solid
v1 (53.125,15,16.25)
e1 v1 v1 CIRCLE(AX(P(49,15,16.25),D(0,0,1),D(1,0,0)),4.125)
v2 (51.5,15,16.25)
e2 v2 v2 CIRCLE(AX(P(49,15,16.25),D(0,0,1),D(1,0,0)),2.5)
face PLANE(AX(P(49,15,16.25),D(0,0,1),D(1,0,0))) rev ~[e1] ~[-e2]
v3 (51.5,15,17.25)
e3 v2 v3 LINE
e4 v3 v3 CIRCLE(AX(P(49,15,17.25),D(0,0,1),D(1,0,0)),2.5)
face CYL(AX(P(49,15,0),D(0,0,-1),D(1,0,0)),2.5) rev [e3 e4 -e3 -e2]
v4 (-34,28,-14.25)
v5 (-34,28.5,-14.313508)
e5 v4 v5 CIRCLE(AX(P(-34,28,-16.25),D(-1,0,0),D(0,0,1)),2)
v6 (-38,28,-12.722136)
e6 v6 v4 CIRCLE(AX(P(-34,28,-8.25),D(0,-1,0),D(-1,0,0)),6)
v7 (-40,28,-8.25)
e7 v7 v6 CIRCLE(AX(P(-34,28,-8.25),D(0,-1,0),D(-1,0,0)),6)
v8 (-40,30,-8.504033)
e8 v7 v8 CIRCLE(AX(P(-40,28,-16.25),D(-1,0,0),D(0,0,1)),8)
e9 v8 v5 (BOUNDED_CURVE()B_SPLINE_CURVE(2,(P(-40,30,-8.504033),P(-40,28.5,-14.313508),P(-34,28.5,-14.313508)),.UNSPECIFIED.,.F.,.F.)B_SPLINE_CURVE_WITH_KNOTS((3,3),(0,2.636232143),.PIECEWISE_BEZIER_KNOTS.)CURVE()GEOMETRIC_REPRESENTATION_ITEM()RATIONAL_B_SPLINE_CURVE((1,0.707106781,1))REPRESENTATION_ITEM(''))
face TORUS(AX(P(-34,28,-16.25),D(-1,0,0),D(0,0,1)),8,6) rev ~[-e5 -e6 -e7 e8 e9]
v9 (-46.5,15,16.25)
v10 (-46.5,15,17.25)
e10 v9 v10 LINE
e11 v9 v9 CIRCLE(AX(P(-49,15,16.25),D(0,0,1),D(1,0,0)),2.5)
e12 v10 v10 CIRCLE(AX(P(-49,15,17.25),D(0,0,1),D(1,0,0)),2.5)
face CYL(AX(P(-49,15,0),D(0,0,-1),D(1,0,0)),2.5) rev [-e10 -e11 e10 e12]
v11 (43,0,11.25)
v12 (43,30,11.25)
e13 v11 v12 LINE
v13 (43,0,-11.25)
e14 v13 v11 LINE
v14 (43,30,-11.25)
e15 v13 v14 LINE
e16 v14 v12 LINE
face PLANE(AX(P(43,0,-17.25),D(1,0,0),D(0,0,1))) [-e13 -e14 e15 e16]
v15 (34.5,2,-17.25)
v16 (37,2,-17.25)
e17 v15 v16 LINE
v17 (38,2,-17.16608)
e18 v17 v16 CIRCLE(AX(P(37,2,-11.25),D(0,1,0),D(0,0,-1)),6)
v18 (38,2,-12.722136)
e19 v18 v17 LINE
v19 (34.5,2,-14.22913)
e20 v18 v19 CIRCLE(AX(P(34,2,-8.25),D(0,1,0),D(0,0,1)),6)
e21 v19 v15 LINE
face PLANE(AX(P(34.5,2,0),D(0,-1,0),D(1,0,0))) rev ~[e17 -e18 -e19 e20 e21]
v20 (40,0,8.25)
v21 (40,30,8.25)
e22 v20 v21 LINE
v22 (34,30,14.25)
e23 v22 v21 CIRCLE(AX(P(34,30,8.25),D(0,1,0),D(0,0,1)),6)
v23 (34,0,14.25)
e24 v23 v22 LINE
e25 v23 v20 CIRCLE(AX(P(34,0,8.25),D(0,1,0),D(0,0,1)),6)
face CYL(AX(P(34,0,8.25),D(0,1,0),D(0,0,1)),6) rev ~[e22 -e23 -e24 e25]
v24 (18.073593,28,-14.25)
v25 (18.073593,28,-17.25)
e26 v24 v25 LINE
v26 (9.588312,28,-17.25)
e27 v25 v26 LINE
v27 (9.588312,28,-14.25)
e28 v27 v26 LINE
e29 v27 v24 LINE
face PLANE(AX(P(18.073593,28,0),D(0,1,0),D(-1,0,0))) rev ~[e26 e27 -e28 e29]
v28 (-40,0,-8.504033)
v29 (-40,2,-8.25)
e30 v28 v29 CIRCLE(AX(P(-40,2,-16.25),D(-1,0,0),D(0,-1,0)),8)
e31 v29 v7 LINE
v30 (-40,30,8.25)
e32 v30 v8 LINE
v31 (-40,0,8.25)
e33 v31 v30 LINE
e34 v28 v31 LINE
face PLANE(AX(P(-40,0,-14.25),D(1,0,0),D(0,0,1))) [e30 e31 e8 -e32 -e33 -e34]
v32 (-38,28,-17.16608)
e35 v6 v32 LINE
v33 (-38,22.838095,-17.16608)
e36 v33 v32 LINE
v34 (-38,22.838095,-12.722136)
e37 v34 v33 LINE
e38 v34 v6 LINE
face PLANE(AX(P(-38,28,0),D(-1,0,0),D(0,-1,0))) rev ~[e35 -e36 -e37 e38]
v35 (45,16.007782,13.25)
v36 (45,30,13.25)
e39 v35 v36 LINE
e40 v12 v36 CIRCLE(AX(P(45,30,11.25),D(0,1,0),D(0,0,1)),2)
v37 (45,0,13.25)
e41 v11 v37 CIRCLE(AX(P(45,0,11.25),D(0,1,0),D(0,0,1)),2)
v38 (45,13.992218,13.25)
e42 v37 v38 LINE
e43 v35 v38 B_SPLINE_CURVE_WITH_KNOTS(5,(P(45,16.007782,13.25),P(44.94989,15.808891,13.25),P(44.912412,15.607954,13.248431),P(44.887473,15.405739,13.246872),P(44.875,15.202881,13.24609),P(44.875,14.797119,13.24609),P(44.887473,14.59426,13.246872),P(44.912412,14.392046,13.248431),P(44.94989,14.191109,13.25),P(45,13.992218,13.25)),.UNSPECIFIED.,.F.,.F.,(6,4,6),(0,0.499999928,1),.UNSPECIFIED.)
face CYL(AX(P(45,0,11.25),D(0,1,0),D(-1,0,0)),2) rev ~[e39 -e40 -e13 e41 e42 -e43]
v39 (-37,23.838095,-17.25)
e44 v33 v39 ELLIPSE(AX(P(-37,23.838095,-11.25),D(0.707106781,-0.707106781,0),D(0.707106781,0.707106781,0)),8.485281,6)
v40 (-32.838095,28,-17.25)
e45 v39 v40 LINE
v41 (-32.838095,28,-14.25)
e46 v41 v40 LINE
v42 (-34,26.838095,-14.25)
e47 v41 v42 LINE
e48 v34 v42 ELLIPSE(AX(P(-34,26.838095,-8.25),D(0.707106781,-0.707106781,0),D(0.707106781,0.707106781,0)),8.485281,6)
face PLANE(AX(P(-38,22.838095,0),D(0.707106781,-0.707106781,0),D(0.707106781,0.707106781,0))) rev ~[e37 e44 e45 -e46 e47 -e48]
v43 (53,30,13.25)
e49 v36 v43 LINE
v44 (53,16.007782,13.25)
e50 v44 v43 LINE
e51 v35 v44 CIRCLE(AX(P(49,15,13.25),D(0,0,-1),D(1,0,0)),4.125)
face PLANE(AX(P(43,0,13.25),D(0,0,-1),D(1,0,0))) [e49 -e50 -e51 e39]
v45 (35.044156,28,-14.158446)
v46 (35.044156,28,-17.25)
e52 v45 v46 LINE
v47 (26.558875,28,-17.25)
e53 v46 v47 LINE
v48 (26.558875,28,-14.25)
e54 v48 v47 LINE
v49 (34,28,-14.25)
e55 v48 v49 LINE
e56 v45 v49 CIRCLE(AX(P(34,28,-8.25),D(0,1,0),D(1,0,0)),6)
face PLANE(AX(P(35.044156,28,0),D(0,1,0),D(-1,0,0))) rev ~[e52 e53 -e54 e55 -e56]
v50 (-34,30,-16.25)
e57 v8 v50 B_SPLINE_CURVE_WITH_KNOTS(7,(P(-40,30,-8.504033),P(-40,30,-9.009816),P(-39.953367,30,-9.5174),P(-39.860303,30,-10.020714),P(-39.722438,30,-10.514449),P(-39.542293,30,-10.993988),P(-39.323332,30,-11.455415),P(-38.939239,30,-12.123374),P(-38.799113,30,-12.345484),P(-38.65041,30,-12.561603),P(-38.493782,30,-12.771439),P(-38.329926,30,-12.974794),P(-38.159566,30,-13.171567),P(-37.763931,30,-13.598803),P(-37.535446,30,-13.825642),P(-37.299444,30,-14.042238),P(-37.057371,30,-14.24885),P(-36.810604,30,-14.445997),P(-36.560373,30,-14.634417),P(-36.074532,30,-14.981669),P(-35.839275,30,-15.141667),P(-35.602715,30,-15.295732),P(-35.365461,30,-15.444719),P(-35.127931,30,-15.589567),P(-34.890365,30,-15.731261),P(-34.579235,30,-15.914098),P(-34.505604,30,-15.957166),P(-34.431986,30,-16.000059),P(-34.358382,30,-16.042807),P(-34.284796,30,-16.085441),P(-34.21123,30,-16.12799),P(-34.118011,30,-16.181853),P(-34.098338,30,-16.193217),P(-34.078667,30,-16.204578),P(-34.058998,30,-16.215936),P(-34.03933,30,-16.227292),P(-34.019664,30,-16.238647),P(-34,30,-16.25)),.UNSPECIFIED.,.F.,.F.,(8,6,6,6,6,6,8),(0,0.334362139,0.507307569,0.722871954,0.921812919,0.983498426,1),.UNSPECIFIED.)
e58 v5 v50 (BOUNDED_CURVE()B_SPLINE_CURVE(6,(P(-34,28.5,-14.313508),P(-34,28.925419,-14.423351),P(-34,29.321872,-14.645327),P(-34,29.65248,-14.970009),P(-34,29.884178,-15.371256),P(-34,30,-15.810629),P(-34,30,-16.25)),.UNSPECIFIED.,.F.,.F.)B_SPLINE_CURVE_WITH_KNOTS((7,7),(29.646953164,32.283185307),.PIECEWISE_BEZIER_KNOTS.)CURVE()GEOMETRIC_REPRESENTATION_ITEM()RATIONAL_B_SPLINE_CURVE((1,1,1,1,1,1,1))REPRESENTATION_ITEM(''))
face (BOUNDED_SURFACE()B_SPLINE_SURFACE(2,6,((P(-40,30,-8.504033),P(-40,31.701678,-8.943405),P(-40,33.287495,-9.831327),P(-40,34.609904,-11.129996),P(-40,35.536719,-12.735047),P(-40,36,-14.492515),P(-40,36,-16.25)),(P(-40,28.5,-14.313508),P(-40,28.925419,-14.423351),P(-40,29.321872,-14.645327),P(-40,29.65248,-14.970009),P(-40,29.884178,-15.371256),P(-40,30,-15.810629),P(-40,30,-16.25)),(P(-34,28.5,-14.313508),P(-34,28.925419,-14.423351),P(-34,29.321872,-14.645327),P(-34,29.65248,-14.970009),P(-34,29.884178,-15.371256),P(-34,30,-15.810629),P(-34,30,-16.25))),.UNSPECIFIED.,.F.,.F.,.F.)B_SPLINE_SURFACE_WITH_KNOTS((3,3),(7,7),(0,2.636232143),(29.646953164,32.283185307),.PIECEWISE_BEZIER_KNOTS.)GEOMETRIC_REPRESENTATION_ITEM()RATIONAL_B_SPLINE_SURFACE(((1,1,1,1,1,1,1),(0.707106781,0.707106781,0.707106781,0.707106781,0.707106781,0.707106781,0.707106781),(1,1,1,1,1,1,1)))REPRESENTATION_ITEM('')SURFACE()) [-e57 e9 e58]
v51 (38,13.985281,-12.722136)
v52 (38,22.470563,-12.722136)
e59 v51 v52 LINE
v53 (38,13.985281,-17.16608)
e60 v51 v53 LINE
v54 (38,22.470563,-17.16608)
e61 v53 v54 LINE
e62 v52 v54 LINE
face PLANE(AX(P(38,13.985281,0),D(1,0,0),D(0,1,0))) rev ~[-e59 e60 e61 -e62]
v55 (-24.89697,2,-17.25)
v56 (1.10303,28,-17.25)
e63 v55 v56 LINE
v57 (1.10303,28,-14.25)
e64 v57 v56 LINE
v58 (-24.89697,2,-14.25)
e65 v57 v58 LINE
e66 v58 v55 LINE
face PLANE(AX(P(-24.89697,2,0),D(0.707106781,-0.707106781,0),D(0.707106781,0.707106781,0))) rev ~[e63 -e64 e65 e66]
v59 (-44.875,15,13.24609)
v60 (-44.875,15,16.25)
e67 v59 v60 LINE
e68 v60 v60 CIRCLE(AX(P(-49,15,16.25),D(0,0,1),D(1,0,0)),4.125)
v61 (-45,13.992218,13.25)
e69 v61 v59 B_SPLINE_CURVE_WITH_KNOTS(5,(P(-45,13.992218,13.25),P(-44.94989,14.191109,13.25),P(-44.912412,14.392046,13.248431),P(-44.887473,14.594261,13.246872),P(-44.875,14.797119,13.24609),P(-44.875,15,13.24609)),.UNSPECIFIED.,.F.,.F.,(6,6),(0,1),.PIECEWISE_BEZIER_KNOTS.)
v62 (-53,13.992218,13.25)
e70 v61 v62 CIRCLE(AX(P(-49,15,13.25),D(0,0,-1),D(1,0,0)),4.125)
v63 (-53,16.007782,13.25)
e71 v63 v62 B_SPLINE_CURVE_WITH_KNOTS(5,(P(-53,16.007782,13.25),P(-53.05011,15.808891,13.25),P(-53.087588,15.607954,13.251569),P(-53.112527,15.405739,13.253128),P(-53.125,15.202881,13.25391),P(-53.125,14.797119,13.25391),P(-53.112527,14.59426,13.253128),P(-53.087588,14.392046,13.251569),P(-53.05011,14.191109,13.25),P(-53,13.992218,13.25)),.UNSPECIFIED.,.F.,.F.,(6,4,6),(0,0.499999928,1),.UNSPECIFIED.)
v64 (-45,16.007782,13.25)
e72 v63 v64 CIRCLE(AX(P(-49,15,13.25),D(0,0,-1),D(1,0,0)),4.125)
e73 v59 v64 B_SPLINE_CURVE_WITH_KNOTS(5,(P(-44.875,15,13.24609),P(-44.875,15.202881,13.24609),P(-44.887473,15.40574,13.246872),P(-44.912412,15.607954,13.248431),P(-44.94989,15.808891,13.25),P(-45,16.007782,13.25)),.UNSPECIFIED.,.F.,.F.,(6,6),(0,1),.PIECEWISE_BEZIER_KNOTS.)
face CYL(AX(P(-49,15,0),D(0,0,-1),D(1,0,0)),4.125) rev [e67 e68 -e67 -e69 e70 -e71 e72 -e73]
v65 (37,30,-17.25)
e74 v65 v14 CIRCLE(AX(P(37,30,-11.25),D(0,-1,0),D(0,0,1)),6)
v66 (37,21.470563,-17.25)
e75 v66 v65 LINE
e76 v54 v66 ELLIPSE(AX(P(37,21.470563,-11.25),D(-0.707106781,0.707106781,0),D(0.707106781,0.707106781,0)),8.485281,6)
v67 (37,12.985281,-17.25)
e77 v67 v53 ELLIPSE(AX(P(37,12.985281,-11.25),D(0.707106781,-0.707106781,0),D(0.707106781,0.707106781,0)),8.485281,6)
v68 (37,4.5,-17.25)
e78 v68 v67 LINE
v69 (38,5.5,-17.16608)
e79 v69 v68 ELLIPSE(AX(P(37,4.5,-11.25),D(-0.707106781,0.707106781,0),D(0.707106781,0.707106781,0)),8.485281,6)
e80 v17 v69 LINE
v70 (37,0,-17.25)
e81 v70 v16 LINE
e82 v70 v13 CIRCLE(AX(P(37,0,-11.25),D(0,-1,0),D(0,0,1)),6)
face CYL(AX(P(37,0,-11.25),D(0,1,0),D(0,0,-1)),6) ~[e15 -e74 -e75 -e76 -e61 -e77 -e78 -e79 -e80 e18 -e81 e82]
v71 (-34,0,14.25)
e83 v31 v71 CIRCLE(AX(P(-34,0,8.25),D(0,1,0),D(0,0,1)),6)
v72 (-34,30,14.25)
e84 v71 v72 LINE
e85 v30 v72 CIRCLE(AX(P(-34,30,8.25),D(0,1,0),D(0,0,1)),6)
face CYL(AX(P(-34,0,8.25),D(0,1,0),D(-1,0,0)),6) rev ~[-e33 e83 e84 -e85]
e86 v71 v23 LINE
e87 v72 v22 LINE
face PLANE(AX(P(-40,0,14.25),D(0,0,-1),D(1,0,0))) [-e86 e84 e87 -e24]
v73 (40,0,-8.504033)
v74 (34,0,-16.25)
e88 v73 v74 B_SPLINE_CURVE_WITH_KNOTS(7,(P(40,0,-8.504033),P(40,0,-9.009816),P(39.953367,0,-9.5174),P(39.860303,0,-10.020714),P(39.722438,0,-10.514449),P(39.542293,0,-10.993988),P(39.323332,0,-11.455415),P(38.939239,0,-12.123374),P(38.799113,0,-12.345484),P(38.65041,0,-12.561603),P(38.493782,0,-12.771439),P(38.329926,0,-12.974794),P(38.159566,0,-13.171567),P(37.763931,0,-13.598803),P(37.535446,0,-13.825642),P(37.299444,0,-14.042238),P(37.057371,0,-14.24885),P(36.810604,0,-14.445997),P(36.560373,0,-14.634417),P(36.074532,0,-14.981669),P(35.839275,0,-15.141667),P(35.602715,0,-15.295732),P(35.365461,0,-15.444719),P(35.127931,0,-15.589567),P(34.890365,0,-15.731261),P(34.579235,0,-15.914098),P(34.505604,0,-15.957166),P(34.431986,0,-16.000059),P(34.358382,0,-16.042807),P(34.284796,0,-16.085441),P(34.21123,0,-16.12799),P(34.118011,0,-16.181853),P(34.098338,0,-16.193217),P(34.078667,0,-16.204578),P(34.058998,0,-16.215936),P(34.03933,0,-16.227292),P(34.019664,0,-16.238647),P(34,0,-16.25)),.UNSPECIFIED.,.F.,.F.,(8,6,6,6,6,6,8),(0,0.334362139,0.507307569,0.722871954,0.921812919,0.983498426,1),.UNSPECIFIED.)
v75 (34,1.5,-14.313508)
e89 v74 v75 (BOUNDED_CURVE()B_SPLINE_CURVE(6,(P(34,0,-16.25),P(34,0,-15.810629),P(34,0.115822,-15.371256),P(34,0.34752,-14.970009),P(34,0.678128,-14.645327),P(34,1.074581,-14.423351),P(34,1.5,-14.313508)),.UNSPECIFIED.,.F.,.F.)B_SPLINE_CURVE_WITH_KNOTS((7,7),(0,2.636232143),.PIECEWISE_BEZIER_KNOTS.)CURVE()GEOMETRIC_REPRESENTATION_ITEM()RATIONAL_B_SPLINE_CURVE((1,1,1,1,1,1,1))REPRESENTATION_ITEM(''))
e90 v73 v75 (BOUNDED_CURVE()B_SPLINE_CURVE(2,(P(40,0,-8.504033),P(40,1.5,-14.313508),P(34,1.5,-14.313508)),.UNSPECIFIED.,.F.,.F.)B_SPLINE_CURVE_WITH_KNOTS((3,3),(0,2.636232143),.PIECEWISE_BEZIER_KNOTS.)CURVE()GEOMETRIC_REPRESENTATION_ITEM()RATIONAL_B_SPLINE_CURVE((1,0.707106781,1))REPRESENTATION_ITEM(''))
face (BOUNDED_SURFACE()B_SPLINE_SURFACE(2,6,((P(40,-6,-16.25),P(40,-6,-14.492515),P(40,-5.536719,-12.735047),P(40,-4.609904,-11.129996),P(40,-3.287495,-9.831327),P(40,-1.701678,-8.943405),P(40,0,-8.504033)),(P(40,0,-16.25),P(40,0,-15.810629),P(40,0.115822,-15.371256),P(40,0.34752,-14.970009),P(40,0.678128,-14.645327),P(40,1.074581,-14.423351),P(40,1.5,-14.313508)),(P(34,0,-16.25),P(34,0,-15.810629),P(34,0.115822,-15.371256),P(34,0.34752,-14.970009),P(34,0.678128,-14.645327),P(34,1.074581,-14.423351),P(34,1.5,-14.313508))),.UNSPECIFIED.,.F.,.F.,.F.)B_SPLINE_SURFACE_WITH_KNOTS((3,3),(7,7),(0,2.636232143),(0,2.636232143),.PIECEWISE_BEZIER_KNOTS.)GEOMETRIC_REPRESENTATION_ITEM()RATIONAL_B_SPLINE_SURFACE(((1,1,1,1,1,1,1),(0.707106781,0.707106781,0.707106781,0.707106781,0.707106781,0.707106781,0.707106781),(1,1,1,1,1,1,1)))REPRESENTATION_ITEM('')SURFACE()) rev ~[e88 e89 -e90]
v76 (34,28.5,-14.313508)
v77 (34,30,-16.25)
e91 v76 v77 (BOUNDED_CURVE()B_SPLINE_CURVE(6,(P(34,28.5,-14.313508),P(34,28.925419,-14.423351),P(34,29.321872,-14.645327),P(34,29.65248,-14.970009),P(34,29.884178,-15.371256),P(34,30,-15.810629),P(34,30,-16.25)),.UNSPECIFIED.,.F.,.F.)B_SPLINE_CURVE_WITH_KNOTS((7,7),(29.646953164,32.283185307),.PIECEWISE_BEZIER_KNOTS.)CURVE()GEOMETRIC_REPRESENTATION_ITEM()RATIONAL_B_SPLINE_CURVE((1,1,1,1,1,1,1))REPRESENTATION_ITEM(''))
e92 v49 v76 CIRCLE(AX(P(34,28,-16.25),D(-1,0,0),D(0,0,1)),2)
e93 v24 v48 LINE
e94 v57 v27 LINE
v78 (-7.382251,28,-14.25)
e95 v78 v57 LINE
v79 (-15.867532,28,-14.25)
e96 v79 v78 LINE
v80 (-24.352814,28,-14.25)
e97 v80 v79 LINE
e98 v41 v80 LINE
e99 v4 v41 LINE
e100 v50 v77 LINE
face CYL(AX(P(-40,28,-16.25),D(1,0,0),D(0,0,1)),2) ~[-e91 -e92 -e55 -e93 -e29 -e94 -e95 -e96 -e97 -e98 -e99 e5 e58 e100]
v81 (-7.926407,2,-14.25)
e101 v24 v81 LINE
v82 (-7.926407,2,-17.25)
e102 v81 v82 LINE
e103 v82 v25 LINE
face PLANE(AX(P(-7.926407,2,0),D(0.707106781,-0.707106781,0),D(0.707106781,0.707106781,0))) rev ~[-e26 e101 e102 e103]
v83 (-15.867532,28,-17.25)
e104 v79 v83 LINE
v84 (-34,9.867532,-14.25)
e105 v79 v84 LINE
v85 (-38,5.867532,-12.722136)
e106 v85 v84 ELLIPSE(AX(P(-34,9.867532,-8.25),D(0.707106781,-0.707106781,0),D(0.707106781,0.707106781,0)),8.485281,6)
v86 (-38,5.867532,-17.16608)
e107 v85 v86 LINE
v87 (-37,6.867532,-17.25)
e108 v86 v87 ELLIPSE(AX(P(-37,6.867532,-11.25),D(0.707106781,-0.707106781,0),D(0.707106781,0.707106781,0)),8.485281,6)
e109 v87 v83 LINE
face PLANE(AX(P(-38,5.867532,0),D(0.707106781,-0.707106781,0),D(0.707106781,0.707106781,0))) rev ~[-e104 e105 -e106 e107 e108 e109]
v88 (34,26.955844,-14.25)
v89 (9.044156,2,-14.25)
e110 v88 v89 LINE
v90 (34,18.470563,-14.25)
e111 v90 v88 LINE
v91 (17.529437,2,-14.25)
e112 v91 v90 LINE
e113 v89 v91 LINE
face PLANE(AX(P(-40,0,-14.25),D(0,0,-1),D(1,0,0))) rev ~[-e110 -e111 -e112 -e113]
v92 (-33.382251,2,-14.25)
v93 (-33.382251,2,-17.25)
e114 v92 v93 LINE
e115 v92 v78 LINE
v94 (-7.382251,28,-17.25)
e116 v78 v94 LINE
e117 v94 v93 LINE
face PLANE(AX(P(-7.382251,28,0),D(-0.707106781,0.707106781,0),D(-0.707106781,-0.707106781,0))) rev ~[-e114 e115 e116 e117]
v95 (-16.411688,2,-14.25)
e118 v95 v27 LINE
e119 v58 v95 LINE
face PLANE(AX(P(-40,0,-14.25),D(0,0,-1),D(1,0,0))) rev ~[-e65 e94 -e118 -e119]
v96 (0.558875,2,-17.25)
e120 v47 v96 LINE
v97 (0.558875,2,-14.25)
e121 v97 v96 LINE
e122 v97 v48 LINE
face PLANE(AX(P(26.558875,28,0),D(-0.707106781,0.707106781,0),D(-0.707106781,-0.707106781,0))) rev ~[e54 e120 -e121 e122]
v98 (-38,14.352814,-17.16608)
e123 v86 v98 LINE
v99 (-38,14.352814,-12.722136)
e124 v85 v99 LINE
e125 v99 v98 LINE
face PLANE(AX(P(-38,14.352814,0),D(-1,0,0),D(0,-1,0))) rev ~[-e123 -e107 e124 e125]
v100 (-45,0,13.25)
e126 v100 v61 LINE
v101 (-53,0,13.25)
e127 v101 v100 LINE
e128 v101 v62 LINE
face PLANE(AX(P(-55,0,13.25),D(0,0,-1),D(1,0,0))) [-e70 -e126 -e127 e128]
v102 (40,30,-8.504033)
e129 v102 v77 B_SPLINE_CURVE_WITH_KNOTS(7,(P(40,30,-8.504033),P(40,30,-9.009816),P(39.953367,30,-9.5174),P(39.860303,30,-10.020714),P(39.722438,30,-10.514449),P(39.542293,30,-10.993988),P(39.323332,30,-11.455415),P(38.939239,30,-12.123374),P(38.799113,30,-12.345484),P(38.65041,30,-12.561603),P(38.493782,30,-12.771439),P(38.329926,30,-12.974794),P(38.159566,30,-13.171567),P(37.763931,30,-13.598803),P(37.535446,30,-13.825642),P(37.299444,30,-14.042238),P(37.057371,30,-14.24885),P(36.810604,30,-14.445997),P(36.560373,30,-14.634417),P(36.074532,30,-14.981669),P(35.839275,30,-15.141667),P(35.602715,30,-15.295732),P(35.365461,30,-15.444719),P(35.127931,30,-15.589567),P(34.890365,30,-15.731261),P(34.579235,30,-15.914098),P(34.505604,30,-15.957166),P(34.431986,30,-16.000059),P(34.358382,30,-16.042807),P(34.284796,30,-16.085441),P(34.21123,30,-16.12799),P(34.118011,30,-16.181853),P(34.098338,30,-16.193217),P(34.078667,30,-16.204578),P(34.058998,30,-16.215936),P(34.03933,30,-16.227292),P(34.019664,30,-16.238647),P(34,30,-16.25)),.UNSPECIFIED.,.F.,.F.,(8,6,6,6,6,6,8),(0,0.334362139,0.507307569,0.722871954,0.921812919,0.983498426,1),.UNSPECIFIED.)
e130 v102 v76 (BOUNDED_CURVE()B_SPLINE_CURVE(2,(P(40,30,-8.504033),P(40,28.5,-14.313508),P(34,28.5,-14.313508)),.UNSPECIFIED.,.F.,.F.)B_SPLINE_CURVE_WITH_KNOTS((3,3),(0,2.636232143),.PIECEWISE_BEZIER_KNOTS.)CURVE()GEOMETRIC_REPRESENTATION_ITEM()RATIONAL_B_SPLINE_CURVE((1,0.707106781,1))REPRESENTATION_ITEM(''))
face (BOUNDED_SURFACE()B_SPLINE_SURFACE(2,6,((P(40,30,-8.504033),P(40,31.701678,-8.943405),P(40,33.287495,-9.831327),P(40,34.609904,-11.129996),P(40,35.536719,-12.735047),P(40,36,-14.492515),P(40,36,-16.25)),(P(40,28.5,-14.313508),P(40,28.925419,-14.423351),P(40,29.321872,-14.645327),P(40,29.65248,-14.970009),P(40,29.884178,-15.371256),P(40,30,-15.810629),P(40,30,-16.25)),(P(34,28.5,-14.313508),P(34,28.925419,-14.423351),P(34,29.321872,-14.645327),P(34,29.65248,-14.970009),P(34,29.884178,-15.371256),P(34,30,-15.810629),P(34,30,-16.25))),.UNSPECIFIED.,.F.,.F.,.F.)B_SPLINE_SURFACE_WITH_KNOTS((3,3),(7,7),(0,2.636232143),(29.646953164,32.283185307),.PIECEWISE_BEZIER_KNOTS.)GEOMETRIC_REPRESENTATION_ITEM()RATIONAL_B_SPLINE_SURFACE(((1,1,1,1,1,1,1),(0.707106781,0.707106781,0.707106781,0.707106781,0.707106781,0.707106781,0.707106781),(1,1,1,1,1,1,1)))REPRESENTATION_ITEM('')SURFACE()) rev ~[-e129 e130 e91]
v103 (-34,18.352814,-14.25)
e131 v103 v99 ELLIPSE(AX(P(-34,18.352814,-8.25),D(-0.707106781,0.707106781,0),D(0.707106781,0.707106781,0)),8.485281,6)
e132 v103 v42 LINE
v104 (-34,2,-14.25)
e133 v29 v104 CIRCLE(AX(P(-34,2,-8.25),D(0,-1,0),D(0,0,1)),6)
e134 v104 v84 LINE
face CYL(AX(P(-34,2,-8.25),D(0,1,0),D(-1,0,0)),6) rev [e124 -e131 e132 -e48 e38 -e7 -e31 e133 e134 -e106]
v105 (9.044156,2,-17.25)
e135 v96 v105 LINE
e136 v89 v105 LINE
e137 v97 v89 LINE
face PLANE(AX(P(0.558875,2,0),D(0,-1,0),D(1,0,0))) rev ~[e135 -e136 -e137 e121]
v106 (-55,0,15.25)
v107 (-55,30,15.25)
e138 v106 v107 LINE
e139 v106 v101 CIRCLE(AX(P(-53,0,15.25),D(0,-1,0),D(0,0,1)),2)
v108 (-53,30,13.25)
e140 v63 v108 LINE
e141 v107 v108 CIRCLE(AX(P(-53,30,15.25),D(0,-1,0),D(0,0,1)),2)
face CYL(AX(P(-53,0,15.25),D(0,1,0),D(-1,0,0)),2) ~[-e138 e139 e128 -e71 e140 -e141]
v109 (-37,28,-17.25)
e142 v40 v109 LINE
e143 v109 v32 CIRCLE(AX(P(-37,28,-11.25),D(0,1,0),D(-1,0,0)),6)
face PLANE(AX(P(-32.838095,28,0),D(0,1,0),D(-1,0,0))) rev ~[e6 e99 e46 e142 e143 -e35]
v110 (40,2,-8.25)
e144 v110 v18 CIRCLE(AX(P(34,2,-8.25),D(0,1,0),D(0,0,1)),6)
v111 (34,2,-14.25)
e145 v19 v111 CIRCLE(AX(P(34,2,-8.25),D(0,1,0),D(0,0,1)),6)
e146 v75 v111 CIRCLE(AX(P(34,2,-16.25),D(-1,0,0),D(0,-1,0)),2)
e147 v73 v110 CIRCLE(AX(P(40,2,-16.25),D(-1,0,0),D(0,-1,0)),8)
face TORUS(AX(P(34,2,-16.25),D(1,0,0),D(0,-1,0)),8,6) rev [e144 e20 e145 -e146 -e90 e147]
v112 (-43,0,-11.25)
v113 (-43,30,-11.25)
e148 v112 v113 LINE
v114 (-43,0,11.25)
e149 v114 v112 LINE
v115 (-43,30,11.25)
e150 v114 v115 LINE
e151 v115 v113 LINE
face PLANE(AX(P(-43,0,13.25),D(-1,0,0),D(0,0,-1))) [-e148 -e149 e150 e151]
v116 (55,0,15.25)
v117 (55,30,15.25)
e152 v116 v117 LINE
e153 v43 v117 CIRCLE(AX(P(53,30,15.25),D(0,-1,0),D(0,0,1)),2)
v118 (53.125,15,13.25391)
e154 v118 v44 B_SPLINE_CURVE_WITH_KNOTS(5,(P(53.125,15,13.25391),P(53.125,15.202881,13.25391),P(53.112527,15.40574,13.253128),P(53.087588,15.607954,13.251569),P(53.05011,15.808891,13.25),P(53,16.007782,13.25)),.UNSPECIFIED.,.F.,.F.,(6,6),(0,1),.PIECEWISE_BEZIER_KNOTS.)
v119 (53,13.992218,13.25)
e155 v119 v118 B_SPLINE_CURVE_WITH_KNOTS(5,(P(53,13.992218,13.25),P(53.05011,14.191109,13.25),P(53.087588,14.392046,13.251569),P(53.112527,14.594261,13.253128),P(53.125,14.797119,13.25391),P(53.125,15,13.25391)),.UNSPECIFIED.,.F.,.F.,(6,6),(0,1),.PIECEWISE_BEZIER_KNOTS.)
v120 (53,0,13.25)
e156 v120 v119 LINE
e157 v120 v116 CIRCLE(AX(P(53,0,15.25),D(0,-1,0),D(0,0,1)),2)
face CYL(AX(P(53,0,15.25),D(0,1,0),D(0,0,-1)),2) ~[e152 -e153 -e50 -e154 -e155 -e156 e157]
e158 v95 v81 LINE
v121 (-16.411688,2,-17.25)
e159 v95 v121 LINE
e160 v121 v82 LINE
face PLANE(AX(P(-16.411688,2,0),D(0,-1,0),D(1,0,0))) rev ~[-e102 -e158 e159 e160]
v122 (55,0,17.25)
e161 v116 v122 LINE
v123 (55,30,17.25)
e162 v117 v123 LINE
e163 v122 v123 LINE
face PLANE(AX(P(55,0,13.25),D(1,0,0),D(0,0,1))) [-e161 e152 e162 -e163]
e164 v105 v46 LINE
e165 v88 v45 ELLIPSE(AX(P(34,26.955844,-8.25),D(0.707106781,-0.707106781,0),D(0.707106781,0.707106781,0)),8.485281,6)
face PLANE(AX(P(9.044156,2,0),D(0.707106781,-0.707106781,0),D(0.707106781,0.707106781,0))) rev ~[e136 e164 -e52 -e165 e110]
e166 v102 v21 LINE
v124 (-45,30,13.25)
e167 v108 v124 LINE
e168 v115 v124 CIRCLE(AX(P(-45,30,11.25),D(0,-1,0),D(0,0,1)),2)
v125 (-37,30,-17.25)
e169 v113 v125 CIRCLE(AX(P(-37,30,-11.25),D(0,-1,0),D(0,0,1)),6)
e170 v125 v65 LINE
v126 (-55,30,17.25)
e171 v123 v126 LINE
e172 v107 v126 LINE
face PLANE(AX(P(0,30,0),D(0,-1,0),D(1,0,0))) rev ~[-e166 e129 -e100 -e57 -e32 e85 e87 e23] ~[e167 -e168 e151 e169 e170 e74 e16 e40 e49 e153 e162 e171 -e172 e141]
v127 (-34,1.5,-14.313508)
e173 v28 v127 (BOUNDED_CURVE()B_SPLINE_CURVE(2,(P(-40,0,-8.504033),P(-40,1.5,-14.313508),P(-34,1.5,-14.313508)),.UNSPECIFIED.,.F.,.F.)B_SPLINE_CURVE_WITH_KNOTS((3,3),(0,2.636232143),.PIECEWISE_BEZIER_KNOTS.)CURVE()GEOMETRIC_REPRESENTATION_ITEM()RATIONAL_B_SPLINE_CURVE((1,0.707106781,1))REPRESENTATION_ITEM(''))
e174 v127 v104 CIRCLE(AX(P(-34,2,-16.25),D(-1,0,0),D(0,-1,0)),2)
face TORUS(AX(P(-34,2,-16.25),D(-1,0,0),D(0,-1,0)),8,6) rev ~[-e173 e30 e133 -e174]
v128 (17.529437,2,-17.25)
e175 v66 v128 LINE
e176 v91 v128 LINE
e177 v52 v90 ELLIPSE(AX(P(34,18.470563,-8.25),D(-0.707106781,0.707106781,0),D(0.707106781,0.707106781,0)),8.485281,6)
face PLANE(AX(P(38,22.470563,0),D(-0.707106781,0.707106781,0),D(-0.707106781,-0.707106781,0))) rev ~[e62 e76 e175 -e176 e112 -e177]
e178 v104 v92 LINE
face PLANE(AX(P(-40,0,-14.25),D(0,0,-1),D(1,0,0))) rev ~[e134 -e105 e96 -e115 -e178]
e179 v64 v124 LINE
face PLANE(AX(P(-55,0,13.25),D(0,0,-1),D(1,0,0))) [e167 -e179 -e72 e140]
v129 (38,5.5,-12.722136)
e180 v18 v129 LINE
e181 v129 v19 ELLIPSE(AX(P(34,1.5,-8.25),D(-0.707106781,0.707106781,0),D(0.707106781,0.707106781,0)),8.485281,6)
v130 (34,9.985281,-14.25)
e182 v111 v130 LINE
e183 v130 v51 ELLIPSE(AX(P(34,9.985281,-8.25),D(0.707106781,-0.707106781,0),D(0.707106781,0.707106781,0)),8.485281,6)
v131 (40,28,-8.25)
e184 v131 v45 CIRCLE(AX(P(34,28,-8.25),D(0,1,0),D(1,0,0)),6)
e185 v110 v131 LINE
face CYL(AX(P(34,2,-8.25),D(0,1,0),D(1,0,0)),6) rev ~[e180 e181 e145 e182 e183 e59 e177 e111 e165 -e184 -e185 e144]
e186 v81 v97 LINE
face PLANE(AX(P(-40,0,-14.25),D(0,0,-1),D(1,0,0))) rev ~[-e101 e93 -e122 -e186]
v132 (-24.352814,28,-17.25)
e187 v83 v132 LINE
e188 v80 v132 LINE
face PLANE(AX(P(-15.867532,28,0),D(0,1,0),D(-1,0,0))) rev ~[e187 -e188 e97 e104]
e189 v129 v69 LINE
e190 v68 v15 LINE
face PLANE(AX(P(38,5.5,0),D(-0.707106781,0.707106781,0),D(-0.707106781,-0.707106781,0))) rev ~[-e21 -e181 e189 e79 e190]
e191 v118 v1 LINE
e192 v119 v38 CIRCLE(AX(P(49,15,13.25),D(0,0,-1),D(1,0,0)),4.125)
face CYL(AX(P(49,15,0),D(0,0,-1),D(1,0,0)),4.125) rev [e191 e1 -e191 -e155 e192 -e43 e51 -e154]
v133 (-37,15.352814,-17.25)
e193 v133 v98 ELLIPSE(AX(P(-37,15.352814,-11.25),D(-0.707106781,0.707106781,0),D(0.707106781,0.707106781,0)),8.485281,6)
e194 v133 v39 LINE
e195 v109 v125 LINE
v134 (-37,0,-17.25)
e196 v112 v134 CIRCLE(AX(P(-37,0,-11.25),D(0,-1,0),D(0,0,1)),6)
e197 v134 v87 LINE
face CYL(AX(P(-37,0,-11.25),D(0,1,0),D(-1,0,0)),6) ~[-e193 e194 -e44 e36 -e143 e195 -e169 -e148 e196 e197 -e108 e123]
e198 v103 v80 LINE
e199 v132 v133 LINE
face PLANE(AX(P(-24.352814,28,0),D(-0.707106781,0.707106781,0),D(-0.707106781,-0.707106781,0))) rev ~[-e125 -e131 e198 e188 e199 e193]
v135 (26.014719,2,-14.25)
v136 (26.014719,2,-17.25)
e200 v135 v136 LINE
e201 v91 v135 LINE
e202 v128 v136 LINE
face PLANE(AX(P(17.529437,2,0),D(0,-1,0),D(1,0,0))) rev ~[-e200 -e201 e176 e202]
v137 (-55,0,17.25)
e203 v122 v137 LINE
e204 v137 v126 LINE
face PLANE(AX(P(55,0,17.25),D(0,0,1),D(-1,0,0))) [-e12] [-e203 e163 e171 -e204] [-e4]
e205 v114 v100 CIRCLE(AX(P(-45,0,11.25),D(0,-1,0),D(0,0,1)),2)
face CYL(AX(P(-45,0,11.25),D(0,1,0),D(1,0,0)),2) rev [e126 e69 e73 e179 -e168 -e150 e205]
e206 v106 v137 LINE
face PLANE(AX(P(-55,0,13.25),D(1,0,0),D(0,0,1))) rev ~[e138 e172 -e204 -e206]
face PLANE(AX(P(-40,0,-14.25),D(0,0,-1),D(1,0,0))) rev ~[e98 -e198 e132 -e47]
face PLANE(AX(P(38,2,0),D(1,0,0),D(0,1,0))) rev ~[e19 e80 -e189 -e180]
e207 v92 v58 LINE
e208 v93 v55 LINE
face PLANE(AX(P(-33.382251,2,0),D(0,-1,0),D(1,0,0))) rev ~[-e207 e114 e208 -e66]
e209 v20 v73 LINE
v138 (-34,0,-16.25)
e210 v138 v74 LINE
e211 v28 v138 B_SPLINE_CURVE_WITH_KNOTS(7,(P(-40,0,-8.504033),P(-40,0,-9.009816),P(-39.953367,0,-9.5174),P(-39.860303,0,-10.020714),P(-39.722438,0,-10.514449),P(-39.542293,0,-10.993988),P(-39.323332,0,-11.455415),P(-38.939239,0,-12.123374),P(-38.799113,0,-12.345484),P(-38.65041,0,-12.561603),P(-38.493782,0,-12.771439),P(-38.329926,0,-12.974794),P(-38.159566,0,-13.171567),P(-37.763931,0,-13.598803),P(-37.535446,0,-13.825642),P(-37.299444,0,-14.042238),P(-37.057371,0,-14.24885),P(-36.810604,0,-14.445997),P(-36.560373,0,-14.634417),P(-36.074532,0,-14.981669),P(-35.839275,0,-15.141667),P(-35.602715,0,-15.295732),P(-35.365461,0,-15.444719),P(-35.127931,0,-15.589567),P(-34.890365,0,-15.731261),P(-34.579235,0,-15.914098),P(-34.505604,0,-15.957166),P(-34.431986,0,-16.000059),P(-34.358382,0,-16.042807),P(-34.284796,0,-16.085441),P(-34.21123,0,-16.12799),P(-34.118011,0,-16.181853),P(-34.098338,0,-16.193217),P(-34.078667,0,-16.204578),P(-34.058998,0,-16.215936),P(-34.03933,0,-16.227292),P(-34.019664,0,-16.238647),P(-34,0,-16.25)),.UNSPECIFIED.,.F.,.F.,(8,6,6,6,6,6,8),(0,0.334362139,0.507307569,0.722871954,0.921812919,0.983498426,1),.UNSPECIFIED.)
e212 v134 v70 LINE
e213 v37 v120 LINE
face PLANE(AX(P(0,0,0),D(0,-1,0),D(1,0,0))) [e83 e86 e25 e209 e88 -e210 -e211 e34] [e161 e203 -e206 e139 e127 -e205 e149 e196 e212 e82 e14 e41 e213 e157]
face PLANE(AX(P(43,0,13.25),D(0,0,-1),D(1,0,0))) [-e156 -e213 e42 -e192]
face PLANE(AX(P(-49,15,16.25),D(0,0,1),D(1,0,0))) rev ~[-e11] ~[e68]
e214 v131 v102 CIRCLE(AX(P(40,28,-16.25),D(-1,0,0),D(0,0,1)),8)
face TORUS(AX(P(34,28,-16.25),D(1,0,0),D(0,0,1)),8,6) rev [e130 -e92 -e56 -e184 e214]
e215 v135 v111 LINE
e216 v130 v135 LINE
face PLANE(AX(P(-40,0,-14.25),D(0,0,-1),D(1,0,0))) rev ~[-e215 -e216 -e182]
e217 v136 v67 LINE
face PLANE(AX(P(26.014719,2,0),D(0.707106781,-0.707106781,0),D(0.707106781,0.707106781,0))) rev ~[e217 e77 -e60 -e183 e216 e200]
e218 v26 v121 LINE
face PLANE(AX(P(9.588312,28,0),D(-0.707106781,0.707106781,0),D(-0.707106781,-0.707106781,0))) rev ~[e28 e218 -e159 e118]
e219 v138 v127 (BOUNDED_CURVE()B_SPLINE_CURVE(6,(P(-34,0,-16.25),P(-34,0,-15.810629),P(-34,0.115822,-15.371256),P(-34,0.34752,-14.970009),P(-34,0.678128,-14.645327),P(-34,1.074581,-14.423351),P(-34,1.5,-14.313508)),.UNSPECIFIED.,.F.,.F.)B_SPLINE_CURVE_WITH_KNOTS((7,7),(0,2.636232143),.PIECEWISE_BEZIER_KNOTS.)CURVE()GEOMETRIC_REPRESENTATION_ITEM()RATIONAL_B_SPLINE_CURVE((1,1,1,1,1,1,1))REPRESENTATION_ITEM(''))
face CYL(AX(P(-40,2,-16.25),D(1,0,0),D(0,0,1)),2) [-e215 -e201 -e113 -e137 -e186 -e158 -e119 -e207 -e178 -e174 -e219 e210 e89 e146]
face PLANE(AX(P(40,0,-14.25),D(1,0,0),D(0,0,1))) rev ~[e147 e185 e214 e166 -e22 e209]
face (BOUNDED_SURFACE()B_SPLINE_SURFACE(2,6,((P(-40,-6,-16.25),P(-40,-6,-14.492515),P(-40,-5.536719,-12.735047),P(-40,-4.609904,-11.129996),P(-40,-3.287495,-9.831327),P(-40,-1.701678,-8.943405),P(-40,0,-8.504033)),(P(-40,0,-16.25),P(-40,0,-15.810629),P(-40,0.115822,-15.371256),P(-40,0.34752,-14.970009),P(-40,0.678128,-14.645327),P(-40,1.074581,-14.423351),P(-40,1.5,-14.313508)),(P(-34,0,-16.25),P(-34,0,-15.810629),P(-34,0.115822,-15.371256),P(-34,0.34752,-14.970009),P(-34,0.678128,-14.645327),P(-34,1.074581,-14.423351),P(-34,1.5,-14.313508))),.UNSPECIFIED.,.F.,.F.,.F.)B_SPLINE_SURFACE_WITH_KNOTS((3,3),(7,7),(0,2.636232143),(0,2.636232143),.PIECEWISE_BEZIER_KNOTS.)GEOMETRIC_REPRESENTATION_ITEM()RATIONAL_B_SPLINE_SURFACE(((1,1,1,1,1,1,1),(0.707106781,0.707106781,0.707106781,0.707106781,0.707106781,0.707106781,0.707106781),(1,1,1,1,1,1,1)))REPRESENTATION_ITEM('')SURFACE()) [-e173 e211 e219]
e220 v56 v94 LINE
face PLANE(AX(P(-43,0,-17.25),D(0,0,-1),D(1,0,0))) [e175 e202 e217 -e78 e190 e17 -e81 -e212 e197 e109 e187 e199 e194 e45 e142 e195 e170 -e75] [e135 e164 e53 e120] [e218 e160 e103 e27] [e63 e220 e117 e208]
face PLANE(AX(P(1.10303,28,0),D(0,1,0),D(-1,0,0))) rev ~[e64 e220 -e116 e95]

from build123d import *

# Parameters (mm, degrees)
F0_W     = 80
F0_H     = 28.5
F0_W_2   = 12
F0_H_2   = 4
F2_DEPTH = 30
F3_R     = 2
F4_R     = 2.5
F5_DEPTH = 17.25
F6_R     = 6
F8_DEPTH = 17.25
F4_R_2   = 4.125
F9_DEPTH = 16.25


# Not quite as in the source:
# - two fillets or chamfers of one size are made in one step


with BuildPart() as f2:
    # F0 (on Front) → F2 (new body)
    with BuildSketch(Plane.XZ):
        Polygon((43, 17.25), (-43, 17.25), (-43, 13.25), (-43, -17.25), (43, -17.25), (43, 13.25), align=None)
        Rectangle(F0_W, F0_H, mode=Mode.SUBTRACT)
        with Locations((49, 15.25)):
            Rectangle(F0_W_2, F0_H_2)
        with Locations((-49, 15.25)):
            Rectangle(F0_W_2, F0_H_2)
    extrude(amount=-F2_DEPTH)

    # F3
    f3_edges = [f2.edges().sort_by_distance(p)[0] for p in [
        (0, 0, -14.25),
        (0, 30, -14.25),
        (-43, 15, 13.25),
        (43, 15, 13.25),
        (55, 15, 13.25),
        (-55, 15, 13.25),
    ]]
    fillet(f3_edges, radius=F3_R)

    # F4 (on Top) → F5 (cut, through all)
    with BuildSketch(Plane.XY):
        with Locations((49, 15)):
            Circle(F4_R)
        with Locations((-49, 15)):
            Circle(F4_R)
    extrude(amount=F5_DEPTH, mode=Mode.SUBTRACT)

    # F6 (call 1 of 6: OpenCascade refuses the feature's edges together)
    f6_edges = [f2.edges().sort_by_distance(p)[0] for p in [
        (-40, 15, 14.25),
    ]]
    fillet(f6_edges, radius=F6_R)

    # F6#2 (call 2 of 6)
    f6_2_edges = [f2.edges().sort_by_distance(p)[0] for p in [
        (-40, 15, -14.25),
    ]]
    fillet(f6_2_edges, radius=F6_R)

    # F6#3 (call 3 of 6)
    f6_3_edges = [f2.edges().sort_by_distance(p)[0] for p in [
        (40, 15, 14.25),
    ]]
    fillet(f6_3_edges, radius=F6_R)

    # F6#4 (call 4 of 6)
    f6_4_edges = [f2.edges().sort_by_distance(p)[0] for p in [
        (40, 15, -14.25),
    ]]
    fillet(f6_4_edges, radius=F6_R)

    # F6#5 (call 5 of 6)
    f6_5_edges = [f2.edges().sort_by_distance(p)[0] for p in [
        (-43, 15, -17.25),
    ]]
    fillet(f6_5_edges, radius=F6_R)

    # F6#6 (call 6 of 6)
    f6_6_edges = [f2.edges().sort_by_distance(p)[0] for p in [
        (43, 15, -17.25),
    ]]
    fillet(f6_6_edges, radius=F6_R)

    # F1 (on Top) → F8 (cut, through all)
    with BuildSketch(Plane.XY):
        Polygon((38, 2), (38, 5.5), (34.5, 2), align=None)
        Polygon((38, 13.9852813742), (38, 22.4705627485), (17.5294372515, 2), (26.0147186258, 2), align=None)
        Polygon((9.0441558773, 2), (35.0441558773, 28), (26.558874503, 28), (0.558874503, 2), align=None)
        Polygon((-7.9264068712, 2), (18.0735931288, 28), (9.5883117546, 28), (-16.4116882454, 2), align=None)
        Polygon((-24.8969696197, 2), (1.1030303803, 28), (-7.3822509939, 28), (-33.3822509939, 2), align=None)
        Polygon((-38, 5.8675323681), (-15.8675323681, 28), (-24.3528137424, 28), (-38, 14.3528137424), align=None)
        Polygon((-38, 22.8380951166), (-32.8380951166, 28), (-38, 28), align=None)
    extrude(amount=-F8_DEPTH, mode=Mode.SUBTRACT)

    # F4 (on Top) → F9 (cut)
    with BuildSketch(Plane.XY):
        with Locations((-49, 15)):
            Circle(F4_R_2)
        with Locations((-49, 15)):
            Circle(F4_R, mode=Mode.SUBTRACT)
        with Locations((49, 15)):
            Circle(F4_R_2)
        with Locations((49, 15)):
            Circle(F4_R, mode=Mode.SUBTRACT)
    extrude(amount=F9_DEPTH, mode=Mode.SUBTRACT)


solid = f2.part
